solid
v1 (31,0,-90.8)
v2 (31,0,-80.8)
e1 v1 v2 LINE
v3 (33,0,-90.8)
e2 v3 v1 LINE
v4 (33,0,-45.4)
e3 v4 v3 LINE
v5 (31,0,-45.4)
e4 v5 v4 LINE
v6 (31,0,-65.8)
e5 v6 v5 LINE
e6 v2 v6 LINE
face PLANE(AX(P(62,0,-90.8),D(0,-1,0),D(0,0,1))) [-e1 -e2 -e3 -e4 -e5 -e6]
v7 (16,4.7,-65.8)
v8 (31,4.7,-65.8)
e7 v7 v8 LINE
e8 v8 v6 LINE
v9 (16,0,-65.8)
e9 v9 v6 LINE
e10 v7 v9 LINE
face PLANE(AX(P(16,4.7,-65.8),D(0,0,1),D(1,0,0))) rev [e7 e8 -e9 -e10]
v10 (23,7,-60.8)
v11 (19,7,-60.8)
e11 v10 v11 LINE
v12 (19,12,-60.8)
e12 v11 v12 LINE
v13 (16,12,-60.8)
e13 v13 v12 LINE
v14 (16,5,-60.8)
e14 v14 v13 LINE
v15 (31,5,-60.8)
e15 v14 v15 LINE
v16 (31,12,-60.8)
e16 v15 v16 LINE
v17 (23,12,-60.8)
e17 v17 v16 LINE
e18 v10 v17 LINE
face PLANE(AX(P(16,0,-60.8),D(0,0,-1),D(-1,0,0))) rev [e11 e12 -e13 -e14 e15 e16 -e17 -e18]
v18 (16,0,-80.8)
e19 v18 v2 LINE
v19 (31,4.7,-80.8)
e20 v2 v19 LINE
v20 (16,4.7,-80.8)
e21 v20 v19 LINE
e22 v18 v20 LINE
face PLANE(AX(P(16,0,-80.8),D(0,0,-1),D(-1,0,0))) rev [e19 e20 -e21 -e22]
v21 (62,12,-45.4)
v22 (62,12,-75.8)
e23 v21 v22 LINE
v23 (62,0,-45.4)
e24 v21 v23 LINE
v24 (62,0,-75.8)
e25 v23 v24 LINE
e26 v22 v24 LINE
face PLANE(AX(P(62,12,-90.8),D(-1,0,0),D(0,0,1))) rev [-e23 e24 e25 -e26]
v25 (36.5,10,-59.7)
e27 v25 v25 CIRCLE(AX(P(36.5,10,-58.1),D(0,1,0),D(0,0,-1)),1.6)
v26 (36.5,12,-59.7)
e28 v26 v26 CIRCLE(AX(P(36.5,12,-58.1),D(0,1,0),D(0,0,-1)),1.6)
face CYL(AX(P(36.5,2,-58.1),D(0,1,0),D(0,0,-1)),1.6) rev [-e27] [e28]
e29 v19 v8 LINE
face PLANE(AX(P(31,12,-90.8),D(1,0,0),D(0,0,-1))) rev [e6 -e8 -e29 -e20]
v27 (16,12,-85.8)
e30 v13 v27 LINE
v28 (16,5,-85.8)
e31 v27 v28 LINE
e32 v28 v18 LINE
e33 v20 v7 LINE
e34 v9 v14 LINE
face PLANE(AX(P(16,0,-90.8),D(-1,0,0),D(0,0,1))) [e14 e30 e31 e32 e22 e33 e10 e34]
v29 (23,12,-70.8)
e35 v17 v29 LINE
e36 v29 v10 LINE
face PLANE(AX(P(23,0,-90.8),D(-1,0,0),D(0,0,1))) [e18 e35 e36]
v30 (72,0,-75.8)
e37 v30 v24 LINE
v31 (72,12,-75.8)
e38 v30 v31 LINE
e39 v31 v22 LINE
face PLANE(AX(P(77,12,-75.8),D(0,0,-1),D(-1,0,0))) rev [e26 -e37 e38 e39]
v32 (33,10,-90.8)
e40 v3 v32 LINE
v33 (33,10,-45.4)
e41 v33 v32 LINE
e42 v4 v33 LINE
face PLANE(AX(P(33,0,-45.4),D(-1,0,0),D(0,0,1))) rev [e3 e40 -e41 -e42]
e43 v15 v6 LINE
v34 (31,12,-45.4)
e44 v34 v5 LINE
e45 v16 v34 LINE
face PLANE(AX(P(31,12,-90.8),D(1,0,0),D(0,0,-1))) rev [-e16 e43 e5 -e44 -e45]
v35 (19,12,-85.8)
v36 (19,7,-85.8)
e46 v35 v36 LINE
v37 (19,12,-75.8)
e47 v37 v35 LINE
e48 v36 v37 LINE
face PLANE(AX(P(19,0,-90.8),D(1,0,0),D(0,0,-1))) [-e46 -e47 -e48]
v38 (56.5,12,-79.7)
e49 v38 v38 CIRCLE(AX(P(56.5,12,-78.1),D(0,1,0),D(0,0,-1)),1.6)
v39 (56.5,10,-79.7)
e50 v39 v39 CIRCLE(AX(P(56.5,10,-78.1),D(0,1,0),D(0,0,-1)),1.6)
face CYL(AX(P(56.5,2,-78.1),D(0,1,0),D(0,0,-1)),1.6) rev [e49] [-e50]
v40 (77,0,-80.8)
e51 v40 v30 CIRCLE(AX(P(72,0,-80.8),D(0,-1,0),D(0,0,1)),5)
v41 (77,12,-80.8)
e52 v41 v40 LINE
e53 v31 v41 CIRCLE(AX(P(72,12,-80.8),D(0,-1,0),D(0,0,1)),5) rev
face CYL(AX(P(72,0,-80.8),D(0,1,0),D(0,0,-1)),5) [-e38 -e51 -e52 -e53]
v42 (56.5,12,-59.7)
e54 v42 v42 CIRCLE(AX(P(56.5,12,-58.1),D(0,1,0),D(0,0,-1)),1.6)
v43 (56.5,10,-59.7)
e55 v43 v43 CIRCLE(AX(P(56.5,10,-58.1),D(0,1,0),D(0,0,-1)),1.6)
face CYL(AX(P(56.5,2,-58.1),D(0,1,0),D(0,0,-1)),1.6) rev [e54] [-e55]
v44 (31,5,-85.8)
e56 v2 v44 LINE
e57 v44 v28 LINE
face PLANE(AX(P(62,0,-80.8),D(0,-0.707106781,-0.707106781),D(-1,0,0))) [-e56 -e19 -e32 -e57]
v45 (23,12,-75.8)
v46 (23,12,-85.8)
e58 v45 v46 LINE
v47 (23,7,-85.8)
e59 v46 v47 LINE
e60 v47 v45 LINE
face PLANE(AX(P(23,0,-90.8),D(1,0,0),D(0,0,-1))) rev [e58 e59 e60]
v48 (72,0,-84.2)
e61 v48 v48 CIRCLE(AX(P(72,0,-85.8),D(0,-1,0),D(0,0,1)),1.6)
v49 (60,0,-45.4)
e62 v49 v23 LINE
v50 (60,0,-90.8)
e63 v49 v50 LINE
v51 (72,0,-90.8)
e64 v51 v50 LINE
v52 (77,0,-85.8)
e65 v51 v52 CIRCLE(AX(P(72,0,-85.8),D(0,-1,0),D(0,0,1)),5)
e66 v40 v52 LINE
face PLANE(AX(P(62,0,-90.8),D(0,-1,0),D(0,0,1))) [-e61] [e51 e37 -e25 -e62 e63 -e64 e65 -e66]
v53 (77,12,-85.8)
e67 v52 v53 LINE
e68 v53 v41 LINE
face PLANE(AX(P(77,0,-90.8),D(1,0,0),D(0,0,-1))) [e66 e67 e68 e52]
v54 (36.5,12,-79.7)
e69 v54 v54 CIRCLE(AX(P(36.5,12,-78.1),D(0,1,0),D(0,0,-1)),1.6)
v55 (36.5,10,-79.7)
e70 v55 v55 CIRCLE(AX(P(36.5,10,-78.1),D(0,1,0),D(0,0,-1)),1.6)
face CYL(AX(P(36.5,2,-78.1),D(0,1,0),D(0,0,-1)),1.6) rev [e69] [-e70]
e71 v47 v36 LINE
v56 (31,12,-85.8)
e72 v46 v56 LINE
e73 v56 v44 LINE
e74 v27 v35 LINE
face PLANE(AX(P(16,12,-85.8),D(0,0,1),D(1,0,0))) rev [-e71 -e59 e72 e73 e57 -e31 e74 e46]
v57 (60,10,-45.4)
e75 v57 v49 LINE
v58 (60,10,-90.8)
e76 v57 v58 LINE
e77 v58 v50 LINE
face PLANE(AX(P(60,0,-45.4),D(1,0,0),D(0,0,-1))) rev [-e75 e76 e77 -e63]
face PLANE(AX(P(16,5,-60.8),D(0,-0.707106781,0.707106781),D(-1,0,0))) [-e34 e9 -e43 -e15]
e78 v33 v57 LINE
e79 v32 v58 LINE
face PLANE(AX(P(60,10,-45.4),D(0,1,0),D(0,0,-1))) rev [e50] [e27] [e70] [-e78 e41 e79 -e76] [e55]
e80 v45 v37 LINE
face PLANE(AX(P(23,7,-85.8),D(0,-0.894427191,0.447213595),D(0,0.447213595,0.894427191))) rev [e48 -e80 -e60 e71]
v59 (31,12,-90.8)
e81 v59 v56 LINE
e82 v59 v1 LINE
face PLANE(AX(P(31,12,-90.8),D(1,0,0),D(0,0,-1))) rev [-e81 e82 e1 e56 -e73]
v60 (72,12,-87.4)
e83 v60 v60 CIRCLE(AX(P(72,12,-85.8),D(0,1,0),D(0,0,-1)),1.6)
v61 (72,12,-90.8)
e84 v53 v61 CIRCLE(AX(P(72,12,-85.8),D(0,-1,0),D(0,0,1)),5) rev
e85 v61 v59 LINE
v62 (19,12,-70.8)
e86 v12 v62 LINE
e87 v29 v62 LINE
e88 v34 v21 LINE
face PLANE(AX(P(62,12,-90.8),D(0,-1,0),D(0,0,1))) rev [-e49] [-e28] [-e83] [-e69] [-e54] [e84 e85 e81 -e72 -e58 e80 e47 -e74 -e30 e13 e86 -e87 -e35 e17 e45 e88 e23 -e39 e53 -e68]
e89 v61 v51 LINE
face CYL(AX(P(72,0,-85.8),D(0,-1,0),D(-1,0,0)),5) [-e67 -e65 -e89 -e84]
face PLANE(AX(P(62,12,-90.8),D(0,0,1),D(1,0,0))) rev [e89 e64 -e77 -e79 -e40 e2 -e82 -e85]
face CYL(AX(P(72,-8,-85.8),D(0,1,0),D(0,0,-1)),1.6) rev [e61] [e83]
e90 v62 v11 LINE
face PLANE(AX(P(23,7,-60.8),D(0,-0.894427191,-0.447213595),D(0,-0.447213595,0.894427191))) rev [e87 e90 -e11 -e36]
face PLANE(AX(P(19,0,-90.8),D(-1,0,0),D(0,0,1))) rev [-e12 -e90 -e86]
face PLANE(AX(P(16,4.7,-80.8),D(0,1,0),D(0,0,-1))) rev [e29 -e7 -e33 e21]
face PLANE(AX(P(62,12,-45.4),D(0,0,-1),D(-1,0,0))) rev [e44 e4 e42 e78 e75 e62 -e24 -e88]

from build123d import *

# Parameters (mm, degrees)
SKETCH1_W           = 31
SKETCH1_H           = 45.4
BOSS_EXTRUDE1_DEPTH = 12
SKETCH2_W           = 27
SKETCH2_H           = 10
CUT_EXTRUDE1_DEPTH  = 57.268641356
SKETCH3_R           = 1.6
CUT_EXTRUDE2_DEPTH  = 10
SKETCH4_W           = 15
SKETCH4_H           = 12
BOSS_EXTRUDE2_DEPTH = 15
SKETCH5_R           = 1.6
CUT_EXTRUDE3_DEPTH  = 20
FILLET1_R           = 5
BOSS_EXTRUDE3_DEPTH = 15
CHAMFER1_SIZE       = 5
CUT_EXTRUDE4_DEPTH  = 4


with BuildPart() as part:
    # Sketch1 → Boss-Extrude1 (new body)
    with BuildSketch(Plane(origin=(0, 0, 0), x_dir=(1, 0, 0), z_dir=(0, 1, 0))):
        with Locations((15.5, 22.7)):
            Rectangle(SKETCH1_W, SKETCH1_H)
    extrude(amount=BOSS_EXTRUDE1_DEPTH)

    # Sketch2 → Cut-Extrude1 (cut, through all)
    with BuildSketch(Plane.XY):
        with Locations((15.5, 5)):
            Rectangle(SKETCH2_W, SKETCH2_H)
    extrude(amount=-CUT_EXTRUDE1_DEPTH, mode=Mode.SUBTRACT)

    # Sketch3 → Cut-Extrude2 (cut)
    with BuildSketch(Plane(origin=(0, 12, 0), x_dir=(1, 0, 0), z_dir=(0, 1, 0))):
        with Locations(Location((5.5, 32.7, 0), (0, 0, 270))):
            Circle(SKETCH3_R)
        with Locations(Location((25.5, 32.7, 0), (0, 0, 270))):
            Circle(SKETCH3_R)
        with Locations(Location((25.5, 12.7, 0), (0, 0, 270))):
            Circle(SKETCH3_R)
        with Locations(Location((5.5, 12.7, 0), (0, 0, 270))):
            Circle(SKETCH3_R)
    extrude(amount=-CUT_EXTRUDE2_DEPTH, mode=Mode.SUBTRACT)

    # Sketch4 → Boss-Extrude2 (add)
    with BuildSketch(Plane.ZY):
        with Locations((-7.5, 6)):
            Rectangle(SKETCH4_W, SKETCH4_H)
    extrude(amount=BOSS_EXTRUDE2_DEPTH)

    # Sketch5 → Cut-Extrude3 (cut)
    with BuildSketch(Plane(origin=(0, 12, 0), x_dir=(1, 0, 0), z_dir=(0, 1, 0))):
        with Locations(Location((-10, 5, 0), (0, 0, 270))):
            Circle(SKETCH5_R)
    extrude(amount=-CUT_EXTRUDE3_DEPTH, mode=Mode.SUBTRACT)

    # Fillet1
    fillet1_edges = [part.edges().sort_by_distance(p)[0] for p in [
        (-15, 6, -15),
        (-15, 6, 0),
    ]]
    fillet(fillet1_edges, radius=FILLET1_R)

    # Sketch6 → Boss-Extrude3 (add)
    with BuildSketch(Plane(origin=(31, 0, 0), x_dir=(0, 0, -1), z_dir=(1, 0, 0))):
        Polygon((5, 0), (10, 0), (10, 4.7), (25, 4.7), (25, 0), (30, 0), (30, 12), (5, 12), align=None)
    extrude(amount=BOSS_EXTRUDE3_DEPTH)

    # Chamfer1
    chamfer1_edges = [part.edges().sort_by_distance(p)[0] for p in [
        (38.5, 0, -5),
        (38.5, 0, -30),
    ]]
    chamfer(chamfer1_edges, length=CHAMFER1_SIZE - 0.0001)  # a hair under: the kernel refuses the full size

    # Sketch7 → Cut-Extrude4 (cut)
    with BuildSketch(Plane(origin=(43, 0, 0), x_dir=(0, 0, -1), z_dir=(1, 0, 0))):
        Polygon((5, 7), (15, 12), (5, 12), align=None)
        Polygon((30, 7), (20, 12), (30, 12), align=None)
    extrude(amount=-CUT_EXTRUDE4_DEPTH, mode=Mode.SUBTRACT)


with BuildPart() as body_2:
    # Mirror2: mirrored copy
    add(part.part.mirror(Plane(origin=(31, 12, 0), x_dir=(0, 0, 1), z_dir=(-1, 0, 0))))


with BuildPart() as body_3:
    # Mirror3: mirrored copy
    add(body_2.part.mirror(Plane(origin=(62, 12, -45.4), x_dir=(1, 0, 0), z_dir=(0, 0, 1))))


solid = body_3.part
